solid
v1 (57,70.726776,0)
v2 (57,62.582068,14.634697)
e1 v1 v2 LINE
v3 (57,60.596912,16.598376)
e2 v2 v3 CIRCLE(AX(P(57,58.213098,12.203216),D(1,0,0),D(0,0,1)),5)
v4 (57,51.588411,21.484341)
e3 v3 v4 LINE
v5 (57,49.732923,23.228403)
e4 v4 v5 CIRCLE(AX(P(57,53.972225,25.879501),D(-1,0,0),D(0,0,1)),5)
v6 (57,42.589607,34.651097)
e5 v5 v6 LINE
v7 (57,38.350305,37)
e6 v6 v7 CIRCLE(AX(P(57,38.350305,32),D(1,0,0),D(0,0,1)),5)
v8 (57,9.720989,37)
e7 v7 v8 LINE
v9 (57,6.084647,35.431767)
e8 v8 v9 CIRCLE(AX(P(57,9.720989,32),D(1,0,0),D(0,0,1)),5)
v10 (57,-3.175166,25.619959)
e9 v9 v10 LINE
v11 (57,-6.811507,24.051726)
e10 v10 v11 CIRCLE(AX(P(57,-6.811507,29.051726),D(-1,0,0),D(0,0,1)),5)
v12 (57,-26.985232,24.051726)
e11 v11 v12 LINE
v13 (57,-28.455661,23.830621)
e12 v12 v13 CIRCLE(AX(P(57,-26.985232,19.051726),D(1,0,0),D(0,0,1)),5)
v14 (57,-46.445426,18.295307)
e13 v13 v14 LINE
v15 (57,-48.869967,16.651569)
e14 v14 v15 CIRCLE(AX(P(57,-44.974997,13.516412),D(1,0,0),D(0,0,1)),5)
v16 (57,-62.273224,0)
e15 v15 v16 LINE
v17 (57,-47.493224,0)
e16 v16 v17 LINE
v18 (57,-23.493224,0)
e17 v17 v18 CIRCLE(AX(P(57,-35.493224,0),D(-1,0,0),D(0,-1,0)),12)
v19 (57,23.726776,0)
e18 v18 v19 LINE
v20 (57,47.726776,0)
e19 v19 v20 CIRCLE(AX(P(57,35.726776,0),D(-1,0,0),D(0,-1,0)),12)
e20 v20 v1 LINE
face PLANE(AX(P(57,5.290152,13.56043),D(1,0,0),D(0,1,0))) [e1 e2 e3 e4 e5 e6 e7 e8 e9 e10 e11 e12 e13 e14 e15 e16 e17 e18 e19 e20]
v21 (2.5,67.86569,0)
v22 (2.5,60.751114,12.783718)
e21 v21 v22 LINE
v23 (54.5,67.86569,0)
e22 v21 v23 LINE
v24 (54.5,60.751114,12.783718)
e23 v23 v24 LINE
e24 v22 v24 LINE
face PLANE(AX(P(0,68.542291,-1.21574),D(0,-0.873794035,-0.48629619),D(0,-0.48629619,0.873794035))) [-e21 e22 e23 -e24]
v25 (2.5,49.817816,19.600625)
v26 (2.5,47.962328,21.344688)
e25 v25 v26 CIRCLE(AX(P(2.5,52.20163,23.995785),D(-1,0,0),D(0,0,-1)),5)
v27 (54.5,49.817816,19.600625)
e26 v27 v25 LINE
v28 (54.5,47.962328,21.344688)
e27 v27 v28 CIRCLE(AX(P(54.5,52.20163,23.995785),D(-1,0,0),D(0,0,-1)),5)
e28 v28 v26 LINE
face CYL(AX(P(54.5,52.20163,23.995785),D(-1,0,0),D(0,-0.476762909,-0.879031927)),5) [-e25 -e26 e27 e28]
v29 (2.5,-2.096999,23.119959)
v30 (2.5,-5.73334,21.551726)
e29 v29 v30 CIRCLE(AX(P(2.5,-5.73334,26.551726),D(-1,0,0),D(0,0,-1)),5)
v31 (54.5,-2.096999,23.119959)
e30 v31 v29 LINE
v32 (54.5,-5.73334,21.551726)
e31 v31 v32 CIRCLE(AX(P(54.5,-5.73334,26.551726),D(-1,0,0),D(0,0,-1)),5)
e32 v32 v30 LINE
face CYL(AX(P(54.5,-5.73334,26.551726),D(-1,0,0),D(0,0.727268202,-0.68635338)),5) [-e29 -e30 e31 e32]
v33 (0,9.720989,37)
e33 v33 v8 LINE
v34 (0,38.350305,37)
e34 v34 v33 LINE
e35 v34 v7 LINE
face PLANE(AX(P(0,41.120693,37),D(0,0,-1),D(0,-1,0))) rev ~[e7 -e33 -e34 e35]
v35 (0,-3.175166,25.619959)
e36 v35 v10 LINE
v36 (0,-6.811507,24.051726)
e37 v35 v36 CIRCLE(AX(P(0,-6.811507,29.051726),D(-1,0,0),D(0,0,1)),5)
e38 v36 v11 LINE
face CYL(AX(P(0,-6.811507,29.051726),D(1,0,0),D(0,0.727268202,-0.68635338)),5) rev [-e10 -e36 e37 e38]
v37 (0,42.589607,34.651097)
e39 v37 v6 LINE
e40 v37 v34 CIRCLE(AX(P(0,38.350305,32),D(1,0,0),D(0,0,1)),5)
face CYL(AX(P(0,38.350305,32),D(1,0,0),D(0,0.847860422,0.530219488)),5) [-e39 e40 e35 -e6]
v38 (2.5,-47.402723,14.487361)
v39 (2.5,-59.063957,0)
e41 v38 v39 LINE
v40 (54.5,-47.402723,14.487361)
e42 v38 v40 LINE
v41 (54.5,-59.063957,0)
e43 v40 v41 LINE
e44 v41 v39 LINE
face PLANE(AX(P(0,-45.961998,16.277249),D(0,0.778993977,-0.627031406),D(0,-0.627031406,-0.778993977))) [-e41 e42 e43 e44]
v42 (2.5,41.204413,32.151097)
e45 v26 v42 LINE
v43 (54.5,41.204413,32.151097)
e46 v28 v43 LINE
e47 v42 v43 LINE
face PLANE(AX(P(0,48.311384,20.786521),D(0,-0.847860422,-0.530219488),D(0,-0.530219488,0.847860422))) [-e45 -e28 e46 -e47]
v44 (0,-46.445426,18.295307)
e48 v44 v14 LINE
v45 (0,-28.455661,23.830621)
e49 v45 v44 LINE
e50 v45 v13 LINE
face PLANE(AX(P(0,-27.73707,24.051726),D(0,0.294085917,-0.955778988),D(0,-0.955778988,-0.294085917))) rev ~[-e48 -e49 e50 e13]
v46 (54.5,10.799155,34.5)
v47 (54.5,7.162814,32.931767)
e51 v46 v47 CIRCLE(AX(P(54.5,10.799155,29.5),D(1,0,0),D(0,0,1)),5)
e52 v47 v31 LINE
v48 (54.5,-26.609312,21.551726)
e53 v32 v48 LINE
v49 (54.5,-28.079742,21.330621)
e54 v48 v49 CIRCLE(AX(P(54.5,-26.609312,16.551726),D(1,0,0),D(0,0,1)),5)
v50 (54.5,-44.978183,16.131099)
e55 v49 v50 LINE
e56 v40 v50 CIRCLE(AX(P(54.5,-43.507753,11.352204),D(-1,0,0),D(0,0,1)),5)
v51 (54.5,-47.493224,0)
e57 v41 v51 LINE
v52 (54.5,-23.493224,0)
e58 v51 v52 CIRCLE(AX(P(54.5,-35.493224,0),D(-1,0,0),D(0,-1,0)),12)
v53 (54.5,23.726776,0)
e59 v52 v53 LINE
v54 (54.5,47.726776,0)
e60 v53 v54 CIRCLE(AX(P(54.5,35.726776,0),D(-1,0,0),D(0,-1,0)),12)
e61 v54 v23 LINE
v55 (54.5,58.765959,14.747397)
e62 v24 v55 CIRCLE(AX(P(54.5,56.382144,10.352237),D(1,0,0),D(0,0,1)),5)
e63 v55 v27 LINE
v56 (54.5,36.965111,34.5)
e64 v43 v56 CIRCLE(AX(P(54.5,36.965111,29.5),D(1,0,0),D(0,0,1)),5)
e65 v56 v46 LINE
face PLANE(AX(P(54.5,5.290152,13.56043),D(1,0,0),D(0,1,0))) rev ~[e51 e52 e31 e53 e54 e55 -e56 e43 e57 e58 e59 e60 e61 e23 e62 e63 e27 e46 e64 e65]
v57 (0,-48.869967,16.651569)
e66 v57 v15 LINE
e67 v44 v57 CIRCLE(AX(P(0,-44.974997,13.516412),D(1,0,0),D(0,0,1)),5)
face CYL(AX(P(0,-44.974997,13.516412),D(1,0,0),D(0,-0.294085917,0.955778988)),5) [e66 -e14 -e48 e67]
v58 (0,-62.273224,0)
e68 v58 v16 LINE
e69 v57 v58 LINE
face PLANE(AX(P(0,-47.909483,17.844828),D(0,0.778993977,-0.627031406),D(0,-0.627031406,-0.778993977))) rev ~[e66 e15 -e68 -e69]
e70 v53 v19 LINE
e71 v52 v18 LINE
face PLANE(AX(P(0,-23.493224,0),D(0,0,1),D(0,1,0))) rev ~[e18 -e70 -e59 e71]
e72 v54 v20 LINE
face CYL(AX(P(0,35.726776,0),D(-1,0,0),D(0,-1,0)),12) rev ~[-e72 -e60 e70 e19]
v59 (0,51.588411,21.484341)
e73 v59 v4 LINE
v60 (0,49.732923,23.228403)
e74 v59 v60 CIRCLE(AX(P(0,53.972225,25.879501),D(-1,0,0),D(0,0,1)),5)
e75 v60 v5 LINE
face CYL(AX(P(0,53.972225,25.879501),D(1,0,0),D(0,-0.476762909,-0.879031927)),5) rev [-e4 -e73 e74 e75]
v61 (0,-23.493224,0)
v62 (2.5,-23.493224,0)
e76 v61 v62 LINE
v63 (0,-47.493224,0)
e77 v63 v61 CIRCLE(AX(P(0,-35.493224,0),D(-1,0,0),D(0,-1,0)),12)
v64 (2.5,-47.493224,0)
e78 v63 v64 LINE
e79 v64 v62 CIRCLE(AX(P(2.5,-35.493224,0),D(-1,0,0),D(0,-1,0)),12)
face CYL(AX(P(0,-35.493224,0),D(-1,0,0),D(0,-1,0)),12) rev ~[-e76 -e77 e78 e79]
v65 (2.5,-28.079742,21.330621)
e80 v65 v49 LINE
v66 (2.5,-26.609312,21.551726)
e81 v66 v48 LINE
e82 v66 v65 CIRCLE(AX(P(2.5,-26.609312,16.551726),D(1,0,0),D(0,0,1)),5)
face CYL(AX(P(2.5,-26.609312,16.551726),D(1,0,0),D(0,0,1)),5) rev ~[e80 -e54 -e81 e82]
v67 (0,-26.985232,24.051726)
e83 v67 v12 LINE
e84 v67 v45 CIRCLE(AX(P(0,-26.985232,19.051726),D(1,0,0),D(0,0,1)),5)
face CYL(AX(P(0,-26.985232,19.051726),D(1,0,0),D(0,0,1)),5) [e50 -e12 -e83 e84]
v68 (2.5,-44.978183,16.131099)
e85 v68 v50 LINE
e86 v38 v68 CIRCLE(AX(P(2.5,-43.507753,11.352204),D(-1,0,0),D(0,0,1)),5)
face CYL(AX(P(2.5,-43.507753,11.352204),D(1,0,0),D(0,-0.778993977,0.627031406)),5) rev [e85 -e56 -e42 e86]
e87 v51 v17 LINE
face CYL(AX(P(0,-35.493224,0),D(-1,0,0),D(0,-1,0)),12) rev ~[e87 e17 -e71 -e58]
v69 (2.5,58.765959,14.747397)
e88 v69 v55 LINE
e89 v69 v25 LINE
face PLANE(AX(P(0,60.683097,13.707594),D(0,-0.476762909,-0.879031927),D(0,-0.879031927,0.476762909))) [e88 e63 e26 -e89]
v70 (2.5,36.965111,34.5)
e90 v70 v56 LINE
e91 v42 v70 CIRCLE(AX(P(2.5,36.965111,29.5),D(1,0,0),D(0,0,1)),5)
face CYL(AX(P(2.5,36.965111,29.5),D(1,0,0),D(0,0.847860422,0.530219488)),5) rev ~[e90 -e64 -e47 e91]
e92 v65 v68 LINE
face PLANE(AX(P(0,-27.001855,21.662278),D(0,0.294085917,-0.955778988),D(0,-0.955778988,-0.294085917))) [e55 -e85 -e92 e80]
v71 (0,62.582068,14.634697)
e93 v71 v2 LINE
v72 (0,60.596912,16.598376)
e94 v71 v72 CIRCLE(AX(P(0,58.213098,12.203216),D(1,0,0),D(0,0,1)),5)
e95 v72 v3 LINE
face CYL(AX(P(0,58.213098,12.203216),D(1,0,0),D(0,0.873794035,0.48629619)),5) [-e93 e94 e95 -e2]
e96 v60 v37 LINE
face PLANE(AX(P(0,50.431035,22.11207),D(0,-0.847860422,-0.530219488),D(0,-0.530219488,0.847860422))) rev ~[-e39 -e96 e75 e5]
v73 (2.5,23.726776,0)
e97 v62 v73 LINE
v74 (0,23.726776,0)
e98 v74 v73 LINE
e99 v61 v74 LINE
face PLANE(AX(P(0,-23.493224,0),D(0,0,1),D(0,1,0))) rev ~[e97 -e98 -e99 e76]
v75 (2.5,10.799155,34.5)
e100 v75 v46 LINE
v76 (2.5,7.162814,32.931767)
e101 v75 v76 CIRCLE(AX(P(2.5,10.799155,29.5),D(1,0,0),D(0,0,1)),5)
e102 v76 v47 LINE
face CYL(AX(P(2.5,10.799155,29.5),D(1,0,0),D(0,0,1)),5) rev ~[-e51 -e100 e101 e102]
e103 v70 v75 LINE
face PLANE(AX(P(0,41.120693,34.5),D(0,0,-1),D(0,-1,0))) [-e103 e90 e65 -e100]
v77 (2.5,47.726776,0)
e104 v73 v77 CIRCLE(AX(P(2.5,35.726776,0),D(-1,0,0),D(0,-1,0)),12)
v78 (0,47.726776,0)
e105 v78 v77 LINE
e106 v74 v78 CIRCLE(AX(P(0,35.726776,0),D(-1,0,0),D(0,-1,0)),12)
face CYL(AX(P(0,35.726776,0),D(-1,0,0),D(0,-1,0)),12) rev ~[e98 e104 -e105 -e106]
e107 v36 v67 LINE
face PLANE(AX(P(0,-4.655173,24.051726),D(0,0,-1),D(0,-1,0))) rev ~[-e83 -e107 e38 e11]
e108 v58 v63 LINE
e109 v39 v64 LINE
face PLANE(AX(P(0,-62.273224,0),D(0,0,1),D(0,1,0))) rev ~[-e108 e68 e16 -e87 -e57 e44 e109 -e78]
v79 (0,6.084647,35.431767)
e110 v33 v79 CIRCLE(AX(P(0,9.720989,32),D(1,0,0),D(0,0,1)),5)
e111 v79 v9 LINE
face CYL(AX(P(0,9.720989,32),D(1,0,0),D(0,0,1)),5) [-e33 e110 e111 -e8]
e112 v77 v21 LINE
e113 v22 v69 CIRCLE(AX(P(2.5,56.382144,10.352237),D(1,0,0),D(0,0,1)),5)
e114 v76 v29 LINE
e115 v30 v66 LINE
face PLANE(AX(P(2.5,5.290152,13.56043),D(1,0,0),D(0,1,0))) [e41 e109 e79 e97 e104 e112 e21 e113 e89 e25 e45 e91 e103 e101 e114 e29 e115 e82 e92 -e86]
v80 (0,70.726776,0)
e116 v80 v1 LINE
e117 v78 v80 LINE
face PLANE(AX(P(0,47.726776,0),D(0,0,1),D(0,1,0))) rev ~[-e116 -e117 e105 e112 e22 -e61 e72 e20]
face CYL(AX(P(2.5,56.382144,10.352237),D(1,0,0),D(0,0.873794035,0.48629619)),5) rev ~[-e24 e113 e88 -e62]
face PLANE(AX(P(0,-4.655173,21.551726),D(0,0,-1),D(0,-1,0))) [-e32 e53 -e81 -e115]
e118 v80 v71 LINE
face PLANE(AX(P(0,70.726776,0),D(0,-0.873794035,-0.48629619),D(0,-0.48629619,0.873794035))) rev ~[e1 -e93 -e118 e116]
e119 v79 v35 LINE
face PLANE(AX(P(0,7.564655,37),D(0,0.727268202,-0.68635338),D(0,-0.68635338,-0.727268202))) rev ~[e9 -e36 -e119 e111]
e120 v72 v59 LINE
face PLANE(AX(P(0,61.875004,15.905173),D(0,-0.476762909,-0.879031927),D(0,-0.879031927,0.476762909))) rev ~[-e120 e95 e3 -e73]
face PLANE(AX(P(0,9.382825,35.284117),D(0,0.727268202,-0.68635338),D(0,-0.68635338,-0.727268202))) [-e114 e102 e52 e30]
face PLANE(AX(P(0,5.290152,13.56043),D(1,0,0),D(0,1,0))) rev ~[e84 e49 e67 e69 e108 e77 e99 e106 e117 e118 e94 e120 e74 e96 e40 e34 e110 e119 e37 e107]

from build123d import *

# Parameters (mm, degrees)
F1_DEPTH = 57
F2_T     = -2.5
F3_R     = 5
F4_R     = 5


with BuildPart() as f1:
    # F0 (on Right) → F1 (new body)
    with BuildSketch(Plane.YZ):
        with BuildLine():
            ThreePointArc((23.7267759775, 0), (35.7267759775, 12), (47.7267759775, 0))
            Line((47.7267759775, 0), (70.7267759775, 0))
            Line((70.7267759775, 0), (61.8750043213, 15.9051734954))
            Line((61.8750043213, 15.9051734954), (50.431035459, 22.1120696515))
            Line((50.431035459, 22.1120696515), (41.1206930876, 37))
            Line((41.1206930876, 37), (7.5646545738, 37))
            Line((7.5646545738, 37), (-4.6551725827, 24.0517258644))
            Line((-4.6551725827, 24.0517258644), (-27.737069875, 24.0517258644))
            Line((-27.737069875, 24.0517258644), (-47.9094833136, 17.8448278457))
            Line((-47.9094833136, 17.8448278457), (-62.2732240225, 0))
            Line((-62.2732240225, 0), (-47.4932240225, 0))
            ThreePointArc((-47.4932240225, 0), (-35.4932240225, 12), (-23.4932240225, 0))
            Line((-23.4932240225, 0), (23.7267759775, 0))
        make_face()
    extrude(amount=F1_DEPTH)

    # F2
    f2_openings = [f1.faces().sort_by_distance(p)[0] for p in [
        (28.5, 0.116776, 0),
        (28.5, -35.493224, 12),
        (28.5, 35.726776, 12),
        (28.5, 59.226776, 0),
        (28.5, -54.883224, 0),
    ]]
    offset(amount=F2_T, openings=f2_openings, kind=Kind.INTERSECTION)

    # F3
    f3_edges = [f1.edges().sort_by_distance(p)[0] for p in [
        (28.5, -47.909483, 17.844828),
        (28.5, -27.73707, 24.051726),
        (28.5, -4.655173, 24.051726),
        (28.5, 7.564655, 37),
        (28.5, 41.120693, 37),
        (28.5, 50.431035, 22.11207),
        (28.5, 61.875004, 15.905173),
    ]]
    fillet(f3_edges, radius=F3_R)

    # F4
    f4_edges = [f1.edges().sort_by_distance(p)[0] for p in [
        (28.5, -46.44224, 15.68062),
        (28.5, -27.361151, 21.551726),
        (28.5, -3.577006, 21.551726),
        (28.5, 8.642822, 34.5),
        (28.5, 39.735499, 34.5),
        (28.5, 48.660441, 20.228354),
        (28.5, 60.044051, 14.054195),
    ]]
    fillet(f4_edges, radius=F4_R)


solid = f1.part
